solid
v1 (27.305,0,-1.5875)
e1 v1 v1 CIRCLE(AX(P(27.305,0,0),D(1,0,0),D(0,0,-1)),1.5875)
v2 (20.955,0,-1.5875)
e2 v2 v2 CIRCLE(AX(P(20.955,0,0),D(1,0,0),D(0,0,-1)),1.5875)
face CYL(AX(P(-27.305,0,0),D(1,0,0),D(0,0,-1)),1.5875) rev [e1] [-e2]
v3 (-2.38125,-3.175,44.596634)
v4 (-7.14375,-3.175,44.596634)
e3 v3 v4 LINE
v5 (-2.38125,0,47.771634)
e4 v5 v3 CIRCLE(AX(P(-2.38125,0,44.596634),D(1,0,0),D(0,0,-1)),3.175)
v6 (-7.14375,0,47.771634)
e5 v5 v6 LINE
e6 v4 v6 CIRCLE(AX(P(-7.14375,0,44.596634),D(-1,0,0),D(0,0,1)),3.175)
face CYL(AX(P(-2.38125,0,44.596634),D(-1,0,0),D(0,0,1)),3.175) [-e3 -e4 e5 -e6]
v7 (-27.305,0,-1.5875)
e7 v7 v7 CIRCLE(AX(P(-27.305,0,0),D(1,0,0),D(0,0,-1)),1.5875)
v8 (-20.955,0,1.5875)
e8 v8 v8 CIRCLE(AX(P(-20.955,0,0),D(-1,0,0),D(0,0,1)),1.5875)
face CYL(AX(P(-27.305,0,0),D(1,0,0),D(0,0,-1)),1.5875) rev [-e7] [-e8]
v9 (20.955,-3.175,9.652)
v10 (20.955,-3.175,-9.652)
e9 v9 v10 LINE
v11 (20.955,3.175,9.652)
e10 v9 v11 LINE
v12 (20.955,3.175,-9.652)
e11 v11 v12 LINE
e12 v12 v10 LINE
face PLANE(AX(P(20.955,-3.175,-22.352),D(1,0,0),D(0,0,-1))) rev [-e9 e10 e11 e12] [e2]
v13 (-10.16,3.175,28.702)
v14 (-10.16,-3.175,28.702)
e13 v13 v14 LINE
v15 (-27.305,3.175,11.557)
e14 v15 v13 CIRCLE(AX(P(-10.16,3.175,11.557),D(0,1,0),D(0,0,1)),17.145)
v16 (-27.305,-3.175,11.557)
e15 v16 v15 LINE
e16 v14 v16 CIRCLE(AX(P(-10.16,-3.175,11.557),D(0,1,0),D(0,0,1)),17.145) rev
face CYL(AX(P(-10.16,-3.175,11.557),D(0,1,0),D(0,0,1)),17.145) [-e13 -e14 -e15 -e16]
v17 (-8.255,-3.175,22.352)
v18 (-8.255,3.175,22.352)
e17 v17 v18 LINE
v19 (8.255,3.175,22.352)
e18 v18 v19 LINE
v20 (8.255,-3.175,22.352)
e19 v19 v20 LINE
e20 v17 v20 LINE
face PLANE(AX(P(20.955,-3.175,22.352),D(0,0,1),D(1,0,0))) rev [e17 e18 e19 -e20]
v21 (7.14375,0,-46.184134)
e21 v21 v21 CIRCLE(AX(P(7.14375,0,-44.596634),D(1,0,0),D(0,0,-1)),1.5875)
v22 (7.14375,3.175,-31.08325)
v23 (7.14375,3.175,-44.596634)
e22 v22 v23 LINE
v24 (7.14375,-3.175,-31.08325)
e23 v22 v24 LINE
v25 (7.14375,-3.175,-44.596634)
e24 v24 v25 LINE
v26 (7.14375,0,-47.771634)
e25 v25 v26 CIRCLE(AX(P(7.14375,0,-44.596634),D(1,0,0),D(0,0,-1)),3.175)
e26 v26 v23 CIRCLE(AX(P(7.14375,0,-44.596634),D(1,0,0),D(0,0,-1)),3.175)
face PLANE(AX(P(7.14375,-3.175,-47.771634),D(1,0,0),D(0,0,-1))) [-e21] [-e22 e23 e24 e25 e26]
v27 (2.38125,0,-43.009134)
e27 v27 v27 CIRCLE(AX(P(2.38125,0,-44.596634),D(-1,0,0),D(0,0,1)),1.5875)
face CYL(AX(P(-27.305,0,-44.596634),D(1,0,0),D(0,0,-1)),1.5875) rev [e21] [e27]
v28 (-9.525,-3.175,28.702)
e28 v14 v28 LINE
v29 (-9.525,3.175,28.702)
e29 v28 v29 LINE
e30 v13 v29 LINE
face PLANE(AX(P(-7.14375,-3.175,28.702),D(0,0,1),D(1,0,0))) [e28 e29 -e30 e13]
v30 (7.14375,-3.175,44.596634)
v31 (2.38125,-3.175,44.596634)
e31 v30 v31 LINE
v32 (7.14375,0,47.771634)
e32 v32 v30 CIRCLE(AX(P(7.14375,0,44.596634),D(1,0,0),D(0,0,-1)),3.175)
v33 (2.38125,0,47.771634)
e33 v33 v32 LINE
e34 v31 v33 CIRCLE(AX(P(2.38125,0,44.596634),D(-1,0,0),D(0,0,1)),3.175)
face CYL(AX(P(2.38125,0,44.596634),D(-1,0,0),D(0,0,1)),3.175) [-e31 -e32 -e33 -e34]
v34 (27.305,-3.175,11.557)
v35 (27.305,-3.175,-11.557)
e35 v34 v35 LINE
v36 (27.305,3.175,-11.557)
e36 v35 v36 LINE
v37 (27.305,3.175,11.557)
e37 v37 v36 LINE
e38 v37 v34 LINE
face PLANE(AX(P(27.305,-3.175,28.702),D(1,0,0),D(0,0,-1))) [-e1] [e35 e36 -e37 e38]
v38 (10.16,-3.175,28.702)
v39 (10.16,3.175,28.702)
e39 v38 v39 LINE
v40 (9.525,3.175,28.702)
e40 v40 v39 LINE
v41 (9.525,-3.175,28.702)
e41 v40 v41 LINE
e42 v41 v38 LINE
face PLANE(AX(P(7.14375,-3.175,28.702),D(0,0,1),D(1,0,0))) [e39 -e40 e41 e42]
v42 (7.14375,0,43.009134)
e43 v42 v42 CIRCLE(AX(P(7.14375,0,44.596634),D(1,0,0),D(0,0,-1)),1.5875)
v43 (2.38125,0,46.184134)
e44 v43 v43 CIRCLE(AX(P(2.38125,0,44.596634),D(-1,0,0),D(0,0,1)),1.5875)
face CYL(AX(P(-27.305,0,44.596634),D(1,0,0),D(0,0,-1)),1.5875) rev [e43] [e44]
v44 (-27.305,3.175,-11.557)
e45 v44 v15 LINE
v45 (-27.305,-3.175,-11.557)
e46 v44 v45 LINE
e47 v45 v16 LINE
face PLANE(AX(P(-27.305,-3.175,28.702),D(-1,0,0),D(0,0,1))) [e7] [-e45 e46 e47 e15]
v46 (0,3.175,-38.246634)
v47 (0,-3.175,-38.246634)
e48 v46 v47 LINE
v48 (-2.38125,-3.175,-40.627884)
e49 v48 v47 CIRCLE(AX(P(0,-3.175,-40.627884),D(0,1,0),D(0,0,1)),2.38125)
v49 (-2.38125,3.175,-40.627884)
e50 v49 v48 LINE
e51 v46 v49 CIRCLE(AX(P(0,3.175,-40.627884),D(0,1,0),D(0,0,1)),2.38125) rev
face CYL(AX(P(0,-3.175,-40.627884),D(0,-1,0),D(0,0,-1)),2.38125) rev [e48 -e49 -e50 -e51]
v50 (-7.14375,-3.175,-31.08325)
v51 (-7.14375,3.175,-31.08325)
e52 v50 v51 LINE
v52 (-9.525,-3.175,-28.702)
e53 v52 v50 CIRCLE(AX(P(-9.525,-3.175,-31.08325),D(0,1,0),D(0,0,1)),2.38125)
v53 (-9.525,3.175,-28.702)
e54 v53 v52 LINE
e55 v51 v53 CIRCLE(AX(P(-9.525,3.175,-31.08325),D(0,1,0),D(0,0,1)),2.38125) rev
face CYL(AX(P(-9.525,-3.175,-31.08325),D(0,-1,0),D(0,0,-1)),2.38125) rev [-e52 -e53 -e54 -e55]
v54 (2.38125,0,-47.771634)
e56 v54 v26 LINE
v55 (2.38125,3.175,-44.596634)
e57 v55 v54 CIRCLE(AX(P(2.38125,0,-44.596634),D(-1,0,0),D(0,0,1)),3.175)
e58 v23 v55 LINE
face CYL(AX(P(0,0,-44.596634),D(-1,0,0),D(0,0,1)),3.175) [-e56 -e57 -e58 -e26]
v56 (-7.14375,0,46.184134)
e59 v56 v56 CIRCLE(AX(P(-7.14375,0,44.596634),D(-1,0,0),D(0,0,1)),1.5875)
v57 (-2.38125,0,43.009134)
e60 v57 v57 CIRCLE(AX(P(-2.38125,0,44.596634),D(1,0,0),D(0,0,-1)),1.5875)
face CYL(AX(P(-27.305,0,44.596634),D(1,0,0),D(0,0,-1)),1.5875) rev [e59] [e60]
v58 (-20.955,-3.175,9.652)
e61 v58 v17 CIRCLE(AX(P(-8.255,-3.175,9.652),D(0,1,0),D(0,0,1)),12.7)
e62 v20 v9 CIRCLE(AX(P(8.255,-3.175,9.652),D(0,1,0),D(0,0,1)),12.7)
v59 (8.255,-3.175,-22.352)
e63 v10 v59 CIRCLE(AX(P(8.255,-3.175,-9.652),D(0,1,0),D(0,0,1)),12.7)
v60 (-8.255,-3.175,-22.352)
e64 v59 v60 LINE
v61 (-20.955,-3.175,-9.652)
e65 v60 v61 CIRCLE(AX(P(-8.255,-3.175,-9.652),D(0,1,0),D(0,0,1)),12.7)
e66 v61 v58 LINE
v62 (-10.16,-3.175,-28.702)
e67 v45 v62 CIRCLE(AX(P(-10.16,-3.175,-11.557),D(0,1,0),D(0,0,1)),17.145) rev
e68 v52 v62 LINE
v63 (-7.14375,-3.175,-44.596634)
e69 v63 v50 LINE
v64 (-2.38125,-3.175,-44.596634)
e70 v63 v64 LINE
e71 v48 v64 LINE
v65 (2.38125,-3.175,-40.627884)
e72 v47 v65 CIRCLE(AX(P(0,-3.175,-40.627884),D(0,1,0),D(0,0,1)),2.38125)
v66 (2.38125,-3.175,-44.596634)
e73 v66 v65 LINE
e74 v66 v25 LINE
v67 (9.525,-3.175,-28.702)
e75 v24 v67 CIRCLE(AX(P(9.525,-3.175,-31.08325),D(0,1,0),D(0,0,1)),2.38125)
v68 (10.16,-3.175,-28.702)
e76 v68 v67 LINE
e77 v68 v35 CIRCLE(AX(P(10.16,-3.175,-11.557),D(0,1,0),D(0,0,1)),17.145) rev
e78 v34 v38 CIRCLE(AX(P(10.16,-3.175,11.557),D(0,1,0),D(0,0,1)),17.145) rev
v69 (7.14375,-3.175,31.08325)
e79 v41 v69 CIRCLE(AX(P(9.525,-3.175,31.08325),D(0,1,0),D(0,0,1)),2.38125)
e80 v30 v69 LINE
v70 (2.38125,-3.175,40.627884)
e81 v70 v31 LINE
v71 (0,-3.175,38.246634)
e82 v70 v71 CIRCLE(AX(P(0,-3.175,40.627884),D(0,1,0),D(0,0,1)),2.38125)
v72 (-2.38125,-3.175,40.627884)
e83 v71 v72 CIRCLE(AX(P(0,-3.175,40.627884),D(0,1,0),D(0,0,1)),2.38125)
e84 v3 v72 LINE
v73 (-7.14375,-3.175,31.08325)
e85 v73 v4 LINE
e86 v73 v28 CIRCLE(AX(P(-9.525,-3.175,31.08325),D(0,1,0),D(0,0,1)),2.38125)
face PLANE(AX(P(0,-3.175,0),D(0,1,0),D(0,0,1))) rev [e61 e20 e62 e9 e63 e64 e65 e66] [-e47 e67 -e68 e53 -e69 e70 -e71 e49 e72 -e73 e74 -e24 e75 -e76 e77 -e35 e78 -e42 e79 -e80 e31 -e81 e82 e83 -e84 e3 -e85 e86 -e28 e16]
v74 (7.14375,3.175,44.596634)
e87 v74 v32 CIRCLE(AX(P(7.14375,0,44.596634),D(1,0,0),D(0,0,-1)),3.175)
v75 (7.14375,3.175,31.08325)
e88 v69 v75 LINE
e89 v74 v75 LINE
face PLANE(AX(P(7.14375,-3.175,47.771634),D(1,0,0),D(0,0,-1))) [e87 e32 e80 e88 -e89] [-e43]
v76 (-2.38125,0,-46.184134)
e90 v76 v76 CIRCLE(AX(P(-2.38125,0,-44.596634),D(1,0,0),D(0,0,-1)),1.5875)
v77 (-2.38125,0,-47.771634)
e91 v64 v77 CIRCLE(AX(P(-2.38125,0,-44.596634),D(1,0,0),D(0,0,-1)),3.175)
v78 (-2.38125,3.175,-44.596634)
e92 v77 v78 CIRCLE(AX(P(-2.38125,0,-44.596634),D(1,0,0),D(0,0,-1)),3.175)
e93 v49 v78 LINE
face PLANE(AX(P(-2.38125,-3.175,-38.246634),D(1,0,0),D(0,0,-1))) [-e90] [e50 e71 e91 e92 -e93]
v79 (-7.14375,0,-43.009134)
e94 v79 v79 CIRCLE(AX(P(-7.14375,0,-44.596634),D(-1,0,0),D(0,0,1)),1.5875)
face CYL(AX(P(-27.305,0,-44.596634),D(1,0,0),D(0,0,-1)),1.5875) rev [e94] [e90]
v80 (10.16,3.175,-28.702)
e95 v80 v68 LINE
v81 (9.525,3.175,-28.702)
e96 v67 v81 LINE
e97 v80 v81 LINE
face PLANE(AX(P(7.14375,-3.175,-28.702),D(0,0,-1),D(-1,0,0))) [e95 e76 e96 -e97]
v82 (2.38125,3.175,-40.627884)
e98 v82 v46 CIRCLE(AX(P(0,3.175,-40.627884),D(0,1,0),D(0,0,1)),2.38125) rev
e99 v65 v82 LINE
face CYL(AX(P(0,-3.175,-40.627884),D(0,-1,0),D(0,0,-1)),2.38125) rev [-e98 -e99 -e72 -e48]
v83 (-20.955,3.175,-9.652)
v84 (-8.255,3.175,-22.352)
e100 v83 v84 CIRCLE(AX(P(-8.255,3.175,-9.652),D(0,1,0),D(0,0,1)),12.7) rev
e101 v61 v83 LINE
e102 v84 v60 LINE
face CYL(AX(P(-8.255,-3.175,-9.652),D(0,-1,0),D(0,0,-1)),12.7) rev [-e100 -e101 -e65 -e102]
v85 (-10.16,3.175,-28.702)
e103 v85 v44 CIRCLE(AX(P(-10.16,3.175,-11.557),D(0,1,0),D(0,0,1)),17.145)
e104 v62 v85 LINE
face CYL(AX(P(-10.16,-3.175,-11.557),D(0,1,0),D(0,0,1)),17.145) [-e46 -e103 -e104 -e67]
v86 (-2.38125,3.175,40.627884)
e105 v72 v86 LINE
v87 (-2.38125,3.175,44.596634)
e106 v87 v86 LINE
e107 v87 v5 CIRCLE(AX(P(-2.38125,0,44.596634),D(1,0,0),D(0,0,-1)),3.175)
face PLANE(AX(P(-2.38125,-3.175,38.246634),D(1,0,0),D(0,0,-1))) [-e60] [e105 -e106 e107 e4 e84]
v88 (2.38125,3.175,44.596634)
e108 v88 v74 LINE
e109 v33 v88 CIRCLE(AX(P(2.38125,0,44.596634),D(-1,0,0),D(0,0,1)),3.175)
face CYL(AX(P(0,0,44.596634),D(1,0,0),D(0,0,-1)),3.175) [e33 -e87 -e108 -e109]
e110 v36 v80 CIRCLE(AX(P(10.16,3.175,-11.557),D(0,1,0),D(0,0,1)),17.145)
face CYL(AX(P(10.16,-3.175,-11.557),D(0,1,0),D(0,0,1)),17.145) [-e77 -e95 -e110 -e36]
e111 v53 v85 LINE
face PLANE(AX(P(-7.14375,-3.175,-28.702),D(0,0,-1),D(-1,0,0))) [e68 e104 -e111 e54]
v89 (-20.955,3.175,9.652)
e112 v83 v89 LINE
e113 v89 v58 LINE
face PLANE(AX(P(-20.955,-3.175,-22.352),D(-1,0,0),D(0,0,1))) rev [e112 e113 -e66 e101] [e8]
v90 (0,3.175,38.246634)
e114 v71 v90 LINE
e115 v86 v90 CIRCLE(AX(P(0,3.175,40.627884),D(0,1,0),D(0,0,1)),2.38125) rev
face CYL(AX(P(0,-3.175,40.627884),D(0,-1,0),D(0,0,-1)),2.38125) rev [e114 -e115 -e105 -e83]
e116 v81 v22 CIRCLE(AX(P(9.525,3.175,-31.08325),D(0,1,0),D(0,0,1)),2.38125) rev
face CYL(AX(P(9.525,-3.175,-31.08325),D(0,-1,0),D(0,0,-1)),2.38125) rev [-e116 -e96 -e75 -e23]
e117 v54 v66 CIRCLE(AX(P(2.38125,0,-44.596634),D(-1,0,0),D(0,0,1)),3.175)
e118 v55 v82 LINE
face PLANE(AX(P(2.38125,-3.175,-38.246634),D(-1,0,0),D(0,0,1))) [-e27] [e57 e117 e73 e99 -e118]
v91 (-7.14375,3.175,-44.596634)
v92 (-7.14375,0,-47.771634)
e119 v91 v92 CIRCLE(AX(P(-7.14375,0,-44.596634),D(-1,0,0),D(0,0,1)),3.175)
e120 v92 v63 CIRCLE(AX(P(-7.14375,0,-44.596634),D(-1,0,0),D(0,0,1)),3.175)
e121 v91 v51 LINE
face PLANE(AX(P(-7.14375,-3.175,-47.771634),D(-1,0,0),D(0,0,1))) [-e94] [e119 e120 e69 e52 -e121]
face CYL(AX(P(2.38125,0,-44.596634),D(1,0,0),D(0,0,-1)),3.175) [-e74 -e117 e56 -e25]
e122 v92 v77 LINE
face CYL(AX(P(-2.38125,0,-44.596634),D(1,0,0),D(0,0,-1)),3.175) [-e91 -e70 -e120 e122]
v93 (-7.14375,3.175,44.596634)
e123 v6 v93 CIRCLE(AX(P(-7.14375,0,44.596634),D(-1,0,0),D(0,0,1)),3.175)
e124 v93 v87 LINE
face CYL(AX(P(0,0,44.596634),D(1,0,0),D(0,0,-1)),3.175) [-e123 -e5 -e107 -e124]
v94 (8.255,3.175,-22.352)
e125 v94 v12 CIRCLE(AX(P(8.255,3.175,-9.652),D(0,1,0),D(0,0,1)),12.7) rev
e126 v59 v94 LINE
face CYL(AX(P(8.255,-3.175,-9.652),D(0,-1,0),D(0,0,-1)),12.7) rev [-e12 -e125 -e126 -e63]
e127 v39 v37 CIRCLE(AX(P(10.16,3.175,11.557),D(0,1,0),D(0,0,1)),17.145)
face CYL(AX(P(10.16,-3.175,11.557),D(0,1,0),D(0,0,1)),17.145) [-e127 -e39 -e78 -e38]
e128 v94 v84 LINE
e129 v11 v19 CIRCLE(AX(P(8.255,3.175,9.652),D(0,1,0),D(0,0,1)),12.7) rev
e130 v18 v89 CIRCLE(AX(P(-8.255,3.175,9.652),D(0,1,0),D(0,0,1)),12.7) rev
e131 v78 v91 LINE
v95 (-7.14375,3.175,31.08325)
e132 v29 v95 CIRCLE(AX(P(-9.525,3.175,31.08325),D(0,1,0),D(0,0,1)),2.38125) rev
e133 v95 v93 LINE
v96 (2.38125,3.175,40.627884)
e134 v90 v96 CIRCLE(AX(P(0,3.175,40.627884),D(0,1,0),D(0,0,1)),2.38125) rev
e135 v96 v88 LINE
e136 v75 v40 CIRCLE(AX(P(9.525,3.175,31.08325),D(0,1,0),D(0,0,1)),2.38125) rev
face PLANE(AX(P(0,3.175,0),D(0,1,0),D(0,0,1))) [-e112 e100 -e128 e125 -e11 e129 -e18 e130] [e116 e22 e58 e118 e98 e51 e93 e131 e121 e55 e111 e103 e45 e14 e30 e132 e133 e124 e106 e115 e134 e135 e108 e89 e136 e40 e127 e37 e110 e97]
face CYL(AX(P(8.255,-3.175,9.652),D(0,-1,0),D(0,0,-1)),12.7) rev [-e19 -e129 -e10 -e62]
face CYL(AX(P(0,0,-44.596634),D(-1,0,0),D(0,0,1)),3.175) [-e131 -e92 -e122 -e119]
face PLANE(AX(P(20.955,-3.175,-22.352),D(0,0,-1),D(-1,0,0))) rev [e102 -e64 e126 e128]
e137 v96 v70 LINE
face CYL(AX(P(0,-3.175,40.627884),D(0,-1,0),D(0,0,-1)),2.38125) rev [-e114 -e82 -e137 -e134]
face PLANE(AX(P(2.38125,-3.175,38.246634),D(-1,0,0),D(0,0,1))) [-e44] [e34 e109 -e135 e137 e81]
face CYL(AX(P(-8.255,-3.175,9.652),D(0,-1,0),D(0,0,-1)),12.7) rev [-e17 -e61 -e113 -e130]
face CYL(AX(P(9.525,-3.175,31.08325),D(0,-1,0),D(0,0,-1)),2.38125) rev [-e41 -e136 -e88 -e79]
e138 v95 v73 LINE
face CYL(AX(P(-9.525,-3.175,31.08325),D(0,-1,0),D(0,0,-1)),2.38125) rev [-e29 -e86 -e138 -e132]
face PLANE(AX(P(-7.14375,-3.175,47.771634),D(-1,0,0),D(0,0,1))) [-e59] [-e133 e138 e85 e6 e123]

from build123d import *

# Parameters (mm, degrees)
BOSS_EXTRUDE1_DEPTH      = 3.175
BOSS_EXTRUDE1_DEPTH_BACK = 3.175
SKETCH1_W                = 41.91
SKETCH1_H                = 44.704
CUT_EXTRUDE1_DEPTH       = 56.115992998
CUT_EXTRUDE1_DEPTH_BACK  = 56.115992998
SKETCH2_R                = 1.5875
FILLET1_R                = 3.175
FILLET2_R                = 12.7
FILLET4_R                = 2.38125
FILLET3_R                = 17.145


with BuildPart() as part:
    # Sketch1 → Boss-Extrude1 (new, two sides: drawn at the far end of the back side and taken through both)
    with BuildSketch(Plane(origin=(0, 0, 0), x_dir=(1, 0, 0), z_dir=(0, 1, 0)).offset(-BOSS_EXTRUDE1_DEPTH_BACK)):
        Polygon((-2.38125, -38.2466342), (2.38125, -38.2466342), (2.38125, -47.7716342), (7.14375, -47.7716342), (7.14375, -28.702), (27.305, -28.702), (27.305, 28.702), (7.14375, 28.702), (7.14375, 47.7716342), (2.38125, 47.7716342), (2.38125, 38.2466342), (-2.38125, 38.2466342), (-2.38125, 47.7716342), (-7.14375, 47.7716342), (-7.14375, 28.702), (-27.305, 28.702), (-27.305, -28.702), (-7.14375, -28.702), (-7.14375, -47.7716342), (-2.38125, -47.7716342), align=None)
        Rectangle(SKETCH1_W, SKETCH1_H, mode=Mode.SUBTRACT)
    extrude(amount=BOSS_EXTRUDE1_DEPTH + BOSS_EXTRUDE1_DEPTH_BACK)

    # Sketch2 → Cut-Extrude1 (cut, two sides: drawn at the far end of the back side and taken through both)
    with BuildSketch(Plane(origin=(0, 0, 0), x_dir=(0, 0, -1), z_dir=(1, 0, 0)).offset(-CUT_EXTRUDE1_DEPTH_BACK)):
        Circle(SKETCH2_R)
        with Locations((44.5966342, 0)):
            Circle(SKETCH2_R)
        with Locations((-44.5966342, 0)):
            Circle(SKETCH2_R)
    extrude(amount=CUT_EXTRUDE1_DEPTH + CUT_EXTRUDE1_DEPTH_BACK, mode=Mode.SUBTRACT)

    # Fillet1
    fillet1_edges = [part.edges().sort_by_distance(p)[0] for p in [
        (-4.7625, -3.175, 47.7716342),
        (-4.7625, 3.175, 47.7716342),
        (4.7625, 3.175, 47.7716342),
        (4.7625, -3.175, 47.7716342),
        (4.7625, -3.175, -47.7716342),
        (-4.7625, -3.175, -47.7716342),
        (4.7625, 3.175, -47.7716342),
        (-4.7625, 3.175, -47.7716342),
    ]]
    fillet(fillet1_edges, radius=FILLET1_R - 0.0001)  # a hair under: the kernel refuses the full size

    # Fillet2
    fillet2_edges = [part.edges().sort_by_distance(p)[0] for p in [
        (-20.955, 0, -22.352),
        (20.955, 0, -22.352),
        (20.955, 0, 22.352),
        (-20.955, 0, 22.352),
    ]]
    fillet(fillet2_edges, radius=FILLET2_R)

    # Fillet4
    fillet4_edges = [part.edges().sort_by_distance(p)[0] for p in [
        (7.14375, 0, 28.702),
        (-7.14375, 0, 28.702),
        (7.14375, 0, -28.702),
        (-7.14375, 0, -28.702),
        (-2.38125, 0, -38.2466342),
        (2.38125, 0, -38.2466342),
        (-2.38125, 0, 38.2466342),
        (2.38125, 0, 38.2466342),
    ]]
    fillet(fillet4_edges, radius=FILLET4_R - 0.0001)  # a hair under: the kernel refuses the full size

    # Fillet3
    fillet3_edges = [part.edges().sort_by_distance(p)[0] for p in [
        (-27.305, 0, 28.702),
        (-27.305, 0, -28.702),
        (27.305, 0, -28.702),
        (27.305, 0, 28.702),
    ]]
    fillet(fillet3_edges, radius=FILLET3_R)


solid = part.part
